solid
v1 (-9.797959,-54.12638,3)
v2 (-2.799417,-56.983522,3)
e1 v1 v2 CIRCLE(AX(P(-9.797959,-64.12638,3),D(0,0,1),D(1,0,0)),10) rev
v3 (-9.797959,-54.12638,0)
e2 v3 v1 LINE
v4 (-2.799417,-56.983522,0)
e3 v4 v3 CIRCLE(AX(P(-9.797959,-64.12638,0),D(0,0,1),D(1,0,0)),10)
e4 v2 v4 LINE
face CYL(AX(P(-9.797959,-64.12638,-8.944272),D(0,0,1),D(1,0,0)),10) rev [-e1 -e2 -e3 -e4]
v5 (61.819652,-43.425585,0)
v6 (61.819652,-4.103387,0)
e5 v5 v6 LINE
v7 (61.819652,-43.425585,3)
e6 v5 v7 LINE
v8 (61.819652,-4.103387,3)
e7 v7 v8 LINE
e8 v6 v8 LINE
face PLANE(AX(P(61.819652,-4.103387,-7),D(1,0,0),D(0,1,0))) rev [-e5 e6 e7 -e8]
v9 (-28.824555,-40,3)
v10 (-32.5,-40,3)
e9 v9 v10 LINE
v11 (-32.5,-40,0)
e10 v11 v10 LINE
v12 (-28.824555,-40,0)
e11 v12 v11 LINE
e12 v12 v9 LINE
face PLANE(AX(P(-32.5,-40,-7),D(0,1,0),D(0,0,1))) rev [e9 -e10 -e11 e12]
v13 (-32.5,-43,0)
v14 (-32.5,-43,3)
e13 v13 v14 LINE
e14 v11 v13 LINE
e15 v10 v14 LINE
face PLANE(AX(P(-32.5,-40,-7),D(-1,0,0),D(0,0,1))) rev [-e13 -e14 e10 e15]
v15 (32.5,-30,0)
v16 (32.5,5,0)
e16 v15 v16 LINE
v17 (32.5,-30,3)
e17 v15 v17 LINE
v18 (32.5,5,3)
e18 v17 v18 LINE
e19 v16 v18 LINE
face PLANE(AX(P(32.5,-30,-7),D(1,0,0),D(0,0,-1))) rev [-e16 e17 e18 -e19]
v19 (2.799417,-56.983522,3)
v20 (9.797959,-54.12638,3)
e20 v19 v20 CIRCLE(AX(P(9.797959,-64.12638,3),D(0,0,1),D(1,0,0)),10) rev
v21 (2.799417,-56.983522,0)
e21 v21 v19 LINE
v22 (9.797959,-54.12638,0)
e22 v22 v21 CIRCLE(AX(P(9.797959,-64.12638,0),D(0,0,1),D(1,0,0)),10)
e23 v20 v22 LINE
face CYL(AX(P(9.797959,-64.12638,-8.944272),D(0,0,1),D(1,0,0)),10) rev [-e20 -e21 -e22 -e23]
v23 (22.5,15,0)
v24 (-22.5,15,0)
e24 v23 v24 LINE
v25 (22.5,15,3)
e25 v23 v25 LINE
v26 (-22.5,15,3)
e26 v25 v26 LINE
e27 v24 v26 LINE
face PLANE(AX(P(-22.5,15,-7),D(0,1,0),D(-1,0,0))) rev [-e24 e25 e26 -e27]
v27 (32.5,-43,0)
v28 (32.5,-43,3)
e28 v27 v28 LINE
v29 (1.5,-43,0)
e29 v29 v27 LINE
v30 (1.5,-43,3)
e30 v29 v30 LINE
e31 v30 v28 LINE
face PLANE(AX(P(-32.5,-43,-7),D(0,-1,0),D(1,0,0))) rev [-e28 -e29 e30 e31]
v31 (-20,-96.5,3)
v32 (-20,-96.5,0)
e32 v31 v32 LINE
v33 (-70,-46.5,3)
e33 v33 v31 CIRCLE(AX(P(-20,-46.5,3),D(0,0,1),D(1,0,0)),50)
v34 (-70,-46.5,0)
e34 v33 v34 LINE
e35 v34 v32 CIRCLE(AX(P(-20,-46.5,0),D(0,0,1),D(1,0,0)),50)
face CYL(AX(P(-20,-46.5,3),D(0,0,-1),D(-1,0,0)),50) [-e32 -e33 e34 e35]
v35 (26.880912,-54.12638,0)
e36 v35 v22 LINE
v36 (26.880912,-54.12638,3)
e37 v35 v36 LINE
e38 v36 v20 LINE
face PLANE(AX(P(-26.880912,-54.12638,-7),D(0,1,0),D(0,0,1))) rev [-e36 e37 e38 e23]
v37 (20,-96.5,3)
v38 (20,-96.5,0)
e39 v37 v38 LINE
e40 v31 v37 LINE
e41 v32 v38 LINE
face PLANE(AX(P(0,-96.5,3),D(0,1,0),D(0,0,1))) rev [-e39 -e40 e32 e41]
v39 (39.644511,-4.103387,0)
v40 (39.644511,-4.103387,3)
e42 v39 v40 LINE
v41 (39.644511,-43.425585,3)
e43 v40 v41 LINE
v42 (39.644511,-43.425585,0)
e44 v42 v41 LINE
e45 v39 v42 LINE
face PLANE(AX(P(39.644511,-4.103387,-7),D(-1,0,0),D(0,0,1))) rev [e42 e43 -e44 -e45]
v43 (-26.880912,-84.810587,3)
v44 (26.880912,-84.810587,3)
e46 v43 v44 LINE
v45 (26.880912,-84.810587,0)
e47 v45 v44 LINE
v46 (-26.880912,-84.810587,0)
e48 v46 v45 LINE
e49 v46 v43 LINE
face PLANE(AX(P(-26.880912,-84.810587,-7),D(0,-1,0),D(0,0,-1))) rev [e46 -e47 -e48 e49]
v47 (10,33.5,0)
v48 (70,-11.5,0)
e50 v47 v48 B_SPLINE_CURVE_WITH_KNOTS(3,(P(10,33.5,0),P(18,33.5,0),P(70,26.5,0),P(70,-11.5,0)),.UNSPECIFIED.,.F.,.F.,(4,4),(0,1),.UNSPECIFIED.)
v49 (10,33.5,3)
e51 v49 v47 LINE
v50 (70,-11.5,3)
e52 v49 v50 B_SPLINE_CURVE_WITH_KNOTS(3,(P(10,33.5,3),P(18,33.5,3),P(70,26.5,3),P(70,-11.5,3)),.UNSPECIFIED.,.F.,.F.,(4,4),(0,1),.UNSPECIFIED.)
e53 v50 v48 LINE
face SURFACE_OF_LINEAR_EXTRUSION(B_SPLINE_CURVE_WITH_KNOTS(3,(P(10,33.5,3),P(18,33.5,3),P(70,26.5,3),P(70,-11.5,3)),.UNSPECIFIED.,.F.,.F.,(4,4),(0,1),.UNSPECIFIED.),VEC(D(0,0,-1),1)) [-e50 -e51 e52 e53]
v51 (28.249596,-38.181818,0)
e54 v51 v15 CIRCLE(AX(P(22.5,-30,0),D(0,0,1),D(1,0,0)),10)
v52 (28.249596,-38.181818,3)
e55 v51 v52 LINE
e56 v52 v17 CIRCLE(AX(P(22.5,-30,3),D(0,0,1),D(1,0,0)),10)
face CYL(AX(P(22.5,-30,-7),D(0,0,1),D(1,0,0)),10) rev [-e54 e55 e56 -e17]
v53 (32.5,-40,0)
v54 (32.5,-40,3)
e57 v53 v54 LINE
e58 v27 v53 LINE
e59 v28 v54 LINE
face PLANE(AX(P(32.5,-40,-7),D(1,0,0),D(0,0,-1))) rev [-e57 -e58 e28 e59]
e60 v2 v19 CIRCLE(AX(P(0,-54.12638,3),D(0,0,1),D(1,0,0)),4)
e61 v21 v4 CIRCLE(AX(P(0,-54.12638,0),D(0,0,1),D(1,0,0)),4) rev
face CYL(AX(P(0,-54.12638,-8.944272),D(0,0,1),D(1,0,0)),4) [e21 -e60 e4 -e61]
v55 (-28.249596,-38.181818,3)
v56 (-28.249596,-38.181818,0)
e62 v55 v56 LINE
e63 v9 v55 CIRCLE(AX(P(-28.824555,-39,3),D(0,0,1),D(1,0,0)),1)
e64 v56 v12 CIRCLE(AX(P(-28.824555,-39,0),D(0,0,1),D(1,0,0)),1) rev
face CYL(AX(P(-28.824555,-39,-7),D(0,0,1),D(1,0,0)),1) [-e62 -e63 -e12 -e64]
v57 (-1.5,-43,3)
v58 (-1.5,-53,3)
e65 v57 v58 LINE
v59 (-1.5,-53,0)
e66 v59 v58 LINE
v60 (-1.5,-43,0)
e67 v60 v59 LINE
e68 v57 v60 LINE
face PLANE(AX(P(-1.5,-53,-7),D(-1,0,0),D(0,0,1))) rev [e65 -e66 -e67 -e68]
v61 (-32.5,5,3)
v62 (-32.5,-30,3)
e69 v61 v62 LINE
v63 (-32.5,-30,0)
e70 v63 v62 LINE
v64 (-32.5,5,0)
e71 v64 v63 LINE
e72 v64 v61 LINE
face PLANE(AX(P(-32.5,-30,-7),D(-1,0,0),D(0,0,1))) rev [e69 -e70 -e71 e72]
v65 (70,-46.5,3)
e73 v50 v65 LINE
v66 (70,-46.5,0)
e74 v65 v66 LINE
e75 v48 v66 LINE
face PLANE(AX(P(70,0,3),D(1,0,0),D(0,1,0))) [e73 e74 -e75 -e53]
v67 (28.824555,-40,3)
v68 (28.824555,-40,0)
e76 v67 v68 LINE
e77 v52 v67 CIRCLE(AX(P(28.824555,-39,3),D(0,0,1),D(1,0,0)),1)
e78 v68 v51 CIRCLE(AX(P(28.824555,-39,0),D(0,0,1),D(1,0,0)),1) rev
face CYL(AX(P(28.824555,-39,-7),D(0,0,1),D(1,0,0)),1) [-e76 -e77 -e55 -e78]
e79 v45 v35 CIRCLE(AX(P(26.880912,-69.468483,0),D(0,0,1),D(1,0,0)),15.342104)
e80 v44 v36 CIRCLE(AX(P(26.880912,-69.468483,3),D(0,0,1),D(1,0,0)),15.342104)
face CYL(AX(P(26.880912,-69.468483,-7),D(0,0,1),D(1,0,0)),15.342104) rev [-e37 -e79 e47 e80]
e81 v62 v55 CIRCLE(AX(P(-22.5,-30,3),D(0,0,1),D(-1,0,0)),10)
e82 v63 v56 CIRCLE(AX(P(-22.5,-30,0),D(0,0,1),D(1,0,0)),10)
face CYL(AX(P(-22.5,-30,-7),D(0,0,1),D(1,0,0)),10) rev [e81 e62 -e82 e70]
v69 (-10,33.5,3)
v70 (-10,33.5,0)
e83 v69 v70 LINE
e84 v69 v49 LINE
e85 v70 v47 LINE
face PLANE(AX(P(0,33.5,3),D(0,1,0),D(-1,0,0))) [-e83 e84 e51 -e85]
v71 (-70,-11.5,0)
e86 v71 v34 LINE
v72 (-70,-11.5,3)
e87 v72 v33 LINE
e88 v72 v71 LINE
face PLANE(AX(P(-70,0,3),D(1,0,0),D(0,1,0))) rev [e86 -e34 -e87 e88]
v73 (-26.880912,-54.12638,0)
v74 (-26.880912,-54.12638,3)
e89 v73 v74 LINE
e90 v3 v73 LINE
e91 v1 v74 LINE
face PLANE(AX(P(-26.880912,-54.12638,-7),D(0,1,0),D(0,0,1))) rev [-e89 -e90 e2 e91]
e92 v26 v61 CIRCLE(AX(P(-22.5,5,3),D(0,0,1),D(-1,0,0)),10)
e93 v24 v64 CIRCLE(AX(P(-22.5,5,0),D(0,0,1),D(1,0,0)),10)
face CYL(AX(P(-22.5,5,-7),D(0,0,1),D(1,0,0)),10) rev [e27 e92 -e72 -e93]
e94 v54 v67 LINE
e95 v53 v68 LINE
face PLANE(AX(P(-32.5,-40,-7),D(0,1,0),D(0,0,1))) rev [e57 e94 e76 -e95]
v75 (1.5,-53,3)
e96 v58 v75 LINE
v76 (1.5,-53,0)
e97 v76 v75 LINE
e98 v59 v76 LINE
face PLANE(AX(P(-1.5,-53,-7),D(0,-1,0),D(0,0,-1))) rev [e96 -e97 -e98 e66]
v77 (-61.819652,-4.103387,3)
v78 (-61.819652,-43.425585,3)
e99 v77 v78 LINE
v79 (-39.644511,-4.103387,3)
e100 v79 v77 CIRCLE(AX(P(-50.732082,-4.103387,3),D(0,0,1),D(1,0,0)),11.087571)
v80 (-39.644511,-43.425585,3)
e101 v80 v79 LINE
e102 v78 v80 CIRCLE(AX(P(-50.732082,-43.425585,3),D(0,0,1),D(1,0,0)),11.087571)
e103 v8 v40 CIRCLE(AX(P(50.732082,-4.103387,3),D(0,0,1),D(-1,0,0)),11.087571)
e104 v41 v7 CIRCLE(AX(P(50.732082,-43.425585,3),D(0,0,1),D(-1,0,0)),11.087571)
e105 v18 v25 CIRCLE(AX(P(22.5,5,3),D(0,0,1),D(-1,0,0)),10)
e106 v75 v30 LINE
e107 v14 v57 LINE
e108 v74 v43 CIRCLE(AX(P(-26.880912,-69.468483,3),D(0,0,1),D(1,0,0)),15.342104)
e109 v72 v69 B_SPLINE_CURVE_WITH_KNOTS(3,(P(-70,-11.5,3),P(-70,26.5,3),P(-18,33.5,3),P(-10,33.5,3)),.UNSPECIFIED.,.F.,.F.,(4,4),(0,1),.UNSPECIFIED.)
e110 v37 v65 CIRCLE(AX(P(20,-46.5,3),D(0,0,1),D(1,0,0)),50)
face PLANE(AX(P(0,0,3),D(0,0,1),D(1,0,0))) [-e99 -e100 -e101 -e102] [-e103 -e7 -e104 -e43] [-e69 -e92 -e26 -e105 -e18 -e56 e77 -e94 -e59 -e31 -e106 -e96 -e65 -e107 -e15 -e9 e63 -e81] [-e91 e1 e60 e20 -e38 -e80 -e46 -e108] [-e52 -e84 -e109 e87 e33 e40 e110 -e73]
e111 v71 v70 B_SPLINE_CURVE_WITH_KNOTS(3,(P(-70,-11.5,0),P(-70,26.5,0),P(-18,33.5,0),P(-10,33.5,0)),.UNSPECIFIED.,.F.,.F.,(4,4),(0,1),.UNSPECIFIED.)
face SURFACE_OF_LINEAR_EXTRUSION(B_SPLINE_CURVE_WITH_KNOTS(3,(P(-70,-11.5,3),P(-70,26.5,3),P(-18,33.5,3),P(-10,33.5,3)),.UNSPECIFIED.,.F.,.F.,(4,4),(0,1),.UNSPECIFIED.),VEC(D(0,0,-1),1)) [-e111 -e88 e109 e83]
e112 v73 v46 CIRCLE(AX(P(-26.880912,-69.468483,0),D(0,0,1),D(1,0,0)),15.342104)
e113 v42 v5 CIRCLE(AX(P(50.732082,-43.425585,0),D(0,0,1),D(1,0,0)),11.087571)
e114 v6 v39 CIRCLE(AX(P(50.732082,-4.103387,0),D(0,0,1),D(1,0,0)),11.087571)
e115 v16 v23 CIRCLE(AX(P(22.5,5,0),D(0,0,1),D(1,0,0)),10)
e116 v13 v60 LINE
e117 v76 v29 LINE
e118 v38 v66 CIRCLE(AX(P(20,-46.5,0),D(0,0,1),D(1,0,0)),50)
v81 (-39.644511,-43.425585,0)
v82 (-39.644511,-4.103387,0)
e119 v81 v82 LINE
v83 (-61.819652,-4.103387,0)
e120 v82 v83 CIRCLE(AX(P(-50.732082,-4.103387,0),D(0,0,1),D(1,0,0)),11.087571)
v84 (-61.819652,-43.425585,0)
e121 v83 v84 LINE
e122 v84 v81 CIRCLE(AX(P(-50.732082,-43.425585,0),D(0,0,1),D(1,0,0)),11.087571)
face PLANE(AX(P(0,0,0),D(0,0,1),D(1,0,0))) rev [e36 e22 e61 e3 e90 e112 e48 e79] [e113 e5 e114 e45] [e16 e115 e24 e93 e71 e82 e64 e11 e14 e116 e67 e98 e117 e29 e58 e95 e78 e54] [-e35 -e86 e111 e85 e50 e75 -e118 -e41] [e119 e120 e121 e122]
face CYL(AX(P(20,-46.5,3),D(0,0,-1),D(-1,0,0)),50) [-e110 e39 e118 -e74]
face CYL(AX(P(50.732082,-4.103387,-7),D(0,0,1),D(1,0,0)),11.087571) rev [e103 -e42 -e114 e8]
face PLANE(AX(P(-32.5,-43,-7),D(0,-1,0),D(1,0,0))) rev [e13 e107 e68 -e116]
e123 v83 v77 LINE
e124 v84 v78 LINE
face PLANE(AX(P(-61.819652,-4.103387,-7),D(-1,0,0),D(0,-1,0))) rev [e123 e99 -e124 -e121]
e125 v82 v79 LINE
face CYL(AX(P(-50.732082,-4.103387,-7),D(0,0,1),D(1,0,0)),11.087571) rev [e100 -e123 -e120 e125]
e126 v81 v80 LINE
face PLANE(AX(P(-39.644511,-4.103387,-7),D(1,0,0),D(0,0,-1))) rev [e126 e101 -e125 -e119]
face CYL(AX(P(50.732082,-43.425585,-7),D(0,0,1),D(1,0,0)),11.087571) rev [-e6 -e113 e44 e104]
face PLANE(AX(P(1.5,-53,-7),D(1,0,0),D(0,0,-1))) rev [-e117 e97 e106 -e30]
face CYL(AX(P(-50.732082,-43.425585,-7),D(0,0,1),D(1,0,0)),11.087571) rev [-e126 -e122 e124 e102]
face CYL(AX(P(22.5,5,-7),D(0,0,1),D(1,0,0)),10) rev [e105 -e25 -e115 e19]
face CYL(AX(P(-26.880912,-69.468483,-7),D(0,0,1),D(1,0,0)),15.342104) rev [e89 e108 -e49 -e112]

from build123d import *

# Parameters (mm, degrees)
BOSS_EXTRUDE1_DEPTH = 3
CUT_EXTRUDE1_DEPTH  = 10
SKETCH3_W           = 65
SKETCH3_H           = 3
CUT_EXTRUDE2_DEPTH  = 10
FILLET1_START       = -1
FILLET1_DEPTH       = 5
SKETCH4_W           = 3
SKETCH4_H           = 10
CUT_EXTRUDE3_DEPTH  = 10
BOSS_EXTRUDE2_DEPTH = 3
FILLET2_R           = 10


with BuildPart() as part:
    # Sketch1 → Boss-Extrude1 (new body)
    with BuildSketch(Plane.XY):
        with BuildLine():
            add(Edge.make_bspline(
                [(-70, -11.5), (-70, 26.5), (-18, 33.5), (-10, 33.5)],
                knots=[0, 0, 0, 0, 1, 1, 1, 1], degree=3))
            Line((-70, -11.5), (-70, -46.5))
            ThreePointArc((-70, -46.5), (-55.355339059, -81.855339059), (-20, -96.5))
            Line((-20, -96.5), (20, -96.5))
            ThreePointArc((20, -96.5), (55.355339059, -81.855339059), (70, -46.5))
            Line((70, -46.5), (70, -11.5))
            add(Edge.make_bspline(
                [(10, 33.5), (18, 33.5), (70, 26.5), (70, -11.5)],
                knots=[0, 0, 0, 0, 1, 1, 1, 1], degree=3))
            Line((10, 33.5), (-10, 33.5))
        make_face()
    extrude(amount=BOSS_EXTRUDE1_DEPTH)

    # Sketch2 → Cut-Extrude1 (cut)
    with BuildSketch(Plane.XY.offset(3)):
        with BuildLine():
            Line((-22.5, -40), (22.5, -40))
            ThreePointArc((22.5, -40), (29.571067812, -37.071067812), (32.5, -30))
            Line((32.5, -30), (32.5, 5))
            ThreePointArc((32.5, 5), (29.571067812, 12.071067812), (22.5, 15))
            Line((22.5, 15), (-22.5, 15))
            ThreePointArc((-22.5, 15), (-29.571067812, 12.071067812), (-32.5, 5))
            Line((-32.5, 5), (-32.5, -30))
            ThreePointArc((-32.5, -30), (-29.571067812, -37.071067812), (-22.5, -40))
        make_face()
    extrude(amount=-CUT_EXTRUDE1_DEPTH, mode=Mode.SUBTRACT)

    # Sketch3 → Cut-Extrude2 (cut)
    with BuildSketch(Plane.XY.offset(3)):
        with Locations((0, -41.5)):
            Rectangle(SKETCH3_W, SKETCH3_H)
        with BuildLine():
            Line((-26.880912438, -54.126379534), (26.880912438, -54.126379534))
            ThreePointArc((26.880912438, -54.126379534), (42.22301594, -69.468483036), (26.880912438, -84.810586538))
            Line((26.880912438, -84.810586538), (-26.880912438, -84.810586538))
            ThreePointArc((-26.880912438, -84.810586538), (-42.22301594, -69.468483036), (-26.880912438, -54.126379534))
        make_face()
        with BuildLine():
            Line((-39.64451115, -4.103386604), (-39.64451115, -43.425584655))
            ThreePointArc((-39.64451115, -43.425584655), (-50.732081748, -54.513155253), (-61.819652346, -43.425584655))
            Line((-61.819652346, -43.425584655), (-61.819652346, -4.103386604))
            ThreePointArc((-61.819652346, -4.103386604), (-50.732081748, 6.984183994), (-39.64451115, -4.103386604))
        make_face()
        with BuildLine():
            Line((39.64451115, -4.103386604), (39.64451115, -43.425584655))
            ThreePointArc((39.64451115, -43.425584655), (50.732081748, -54.513155253), (61.819652346, -43.425584655))
            Line((61.819652346, -43.425584655), (61.819652346, -4.103386604))
            ThreePointArc((61.819652346, -4.103386604), (50.732081748, 6.984183994), (39.64451115, -4.103386604))
        make_face()
    extrude(amount=-CUT_EXTRUDE2_DEPTH, mode=Mode.SUBTRACT)

    # Fillet1: read off the stored shape, not the designer's step
    # Fillet1 outline → Fillet1 (cut)
    with BuildSketch(Plane.XY.offset(FILLET1_START)):
        with BuildLine():
            ThreePointArc((28.82455532, -40), (27.871092731, -39.301511345), (28.249595746, -38.181818182))
            ThreePointArc((28.249595746, -38.181818182), (25.515113446, -39.534625893), (22.5, -40))
            Line((22.5, -40), (28.82455532, -40))
        make_face()
        with BuildLine():
            ThreePointArc((-28.249595746, -38.181818182), (-27.871092731, -39.301511345), (-28.82455532, -40))
            Line((-28.82455532, -40), (-22.5, -40))
            ThreePointArc((-22.5, -40), (-25.515113446, -39.534625893), (-28.249595746, -38.181818182))
        make_face()
    extrude(amount=FILLET1_DEPTH, mode=Mode.SUBTRACT)

    # Sketch4 → Cut-Extrude3 (cut)
    with BuildSketch(Plane.XY.offset(3)):
        with Locations((0, -48)):
            Rectangle(SKETCH4_W, SKETCH4_H)
    extrude(amount=-CUT_EXTRUDE3_DEPTH, mode=Mode.SUBTRACT)

    # Sketch5 → Boss-Extrude2 (add)
    with BuildSketch(Plane.XY.offset(3)):
        with BuildLine():
            Line((-4, -54.126379534), (4, -54.126379534))
            ThreePointArc((4, -54.126379534), (0, -58.126379534), (-4, -54.126379534))
        make_face()
    extrude(amount=-BOSS_EXTRUDE2_DEPTH)

    # Fillet2
    fillet2_edges = [part.edges().sort_by_distance(p)[0] for p in [
        (4, -54.126379534, 1.5),
        (-4, -54.126379534, 1.5),
    ]]
    fillet(fillet2_edges, radius=FILLET2_R)


solid = part.part
